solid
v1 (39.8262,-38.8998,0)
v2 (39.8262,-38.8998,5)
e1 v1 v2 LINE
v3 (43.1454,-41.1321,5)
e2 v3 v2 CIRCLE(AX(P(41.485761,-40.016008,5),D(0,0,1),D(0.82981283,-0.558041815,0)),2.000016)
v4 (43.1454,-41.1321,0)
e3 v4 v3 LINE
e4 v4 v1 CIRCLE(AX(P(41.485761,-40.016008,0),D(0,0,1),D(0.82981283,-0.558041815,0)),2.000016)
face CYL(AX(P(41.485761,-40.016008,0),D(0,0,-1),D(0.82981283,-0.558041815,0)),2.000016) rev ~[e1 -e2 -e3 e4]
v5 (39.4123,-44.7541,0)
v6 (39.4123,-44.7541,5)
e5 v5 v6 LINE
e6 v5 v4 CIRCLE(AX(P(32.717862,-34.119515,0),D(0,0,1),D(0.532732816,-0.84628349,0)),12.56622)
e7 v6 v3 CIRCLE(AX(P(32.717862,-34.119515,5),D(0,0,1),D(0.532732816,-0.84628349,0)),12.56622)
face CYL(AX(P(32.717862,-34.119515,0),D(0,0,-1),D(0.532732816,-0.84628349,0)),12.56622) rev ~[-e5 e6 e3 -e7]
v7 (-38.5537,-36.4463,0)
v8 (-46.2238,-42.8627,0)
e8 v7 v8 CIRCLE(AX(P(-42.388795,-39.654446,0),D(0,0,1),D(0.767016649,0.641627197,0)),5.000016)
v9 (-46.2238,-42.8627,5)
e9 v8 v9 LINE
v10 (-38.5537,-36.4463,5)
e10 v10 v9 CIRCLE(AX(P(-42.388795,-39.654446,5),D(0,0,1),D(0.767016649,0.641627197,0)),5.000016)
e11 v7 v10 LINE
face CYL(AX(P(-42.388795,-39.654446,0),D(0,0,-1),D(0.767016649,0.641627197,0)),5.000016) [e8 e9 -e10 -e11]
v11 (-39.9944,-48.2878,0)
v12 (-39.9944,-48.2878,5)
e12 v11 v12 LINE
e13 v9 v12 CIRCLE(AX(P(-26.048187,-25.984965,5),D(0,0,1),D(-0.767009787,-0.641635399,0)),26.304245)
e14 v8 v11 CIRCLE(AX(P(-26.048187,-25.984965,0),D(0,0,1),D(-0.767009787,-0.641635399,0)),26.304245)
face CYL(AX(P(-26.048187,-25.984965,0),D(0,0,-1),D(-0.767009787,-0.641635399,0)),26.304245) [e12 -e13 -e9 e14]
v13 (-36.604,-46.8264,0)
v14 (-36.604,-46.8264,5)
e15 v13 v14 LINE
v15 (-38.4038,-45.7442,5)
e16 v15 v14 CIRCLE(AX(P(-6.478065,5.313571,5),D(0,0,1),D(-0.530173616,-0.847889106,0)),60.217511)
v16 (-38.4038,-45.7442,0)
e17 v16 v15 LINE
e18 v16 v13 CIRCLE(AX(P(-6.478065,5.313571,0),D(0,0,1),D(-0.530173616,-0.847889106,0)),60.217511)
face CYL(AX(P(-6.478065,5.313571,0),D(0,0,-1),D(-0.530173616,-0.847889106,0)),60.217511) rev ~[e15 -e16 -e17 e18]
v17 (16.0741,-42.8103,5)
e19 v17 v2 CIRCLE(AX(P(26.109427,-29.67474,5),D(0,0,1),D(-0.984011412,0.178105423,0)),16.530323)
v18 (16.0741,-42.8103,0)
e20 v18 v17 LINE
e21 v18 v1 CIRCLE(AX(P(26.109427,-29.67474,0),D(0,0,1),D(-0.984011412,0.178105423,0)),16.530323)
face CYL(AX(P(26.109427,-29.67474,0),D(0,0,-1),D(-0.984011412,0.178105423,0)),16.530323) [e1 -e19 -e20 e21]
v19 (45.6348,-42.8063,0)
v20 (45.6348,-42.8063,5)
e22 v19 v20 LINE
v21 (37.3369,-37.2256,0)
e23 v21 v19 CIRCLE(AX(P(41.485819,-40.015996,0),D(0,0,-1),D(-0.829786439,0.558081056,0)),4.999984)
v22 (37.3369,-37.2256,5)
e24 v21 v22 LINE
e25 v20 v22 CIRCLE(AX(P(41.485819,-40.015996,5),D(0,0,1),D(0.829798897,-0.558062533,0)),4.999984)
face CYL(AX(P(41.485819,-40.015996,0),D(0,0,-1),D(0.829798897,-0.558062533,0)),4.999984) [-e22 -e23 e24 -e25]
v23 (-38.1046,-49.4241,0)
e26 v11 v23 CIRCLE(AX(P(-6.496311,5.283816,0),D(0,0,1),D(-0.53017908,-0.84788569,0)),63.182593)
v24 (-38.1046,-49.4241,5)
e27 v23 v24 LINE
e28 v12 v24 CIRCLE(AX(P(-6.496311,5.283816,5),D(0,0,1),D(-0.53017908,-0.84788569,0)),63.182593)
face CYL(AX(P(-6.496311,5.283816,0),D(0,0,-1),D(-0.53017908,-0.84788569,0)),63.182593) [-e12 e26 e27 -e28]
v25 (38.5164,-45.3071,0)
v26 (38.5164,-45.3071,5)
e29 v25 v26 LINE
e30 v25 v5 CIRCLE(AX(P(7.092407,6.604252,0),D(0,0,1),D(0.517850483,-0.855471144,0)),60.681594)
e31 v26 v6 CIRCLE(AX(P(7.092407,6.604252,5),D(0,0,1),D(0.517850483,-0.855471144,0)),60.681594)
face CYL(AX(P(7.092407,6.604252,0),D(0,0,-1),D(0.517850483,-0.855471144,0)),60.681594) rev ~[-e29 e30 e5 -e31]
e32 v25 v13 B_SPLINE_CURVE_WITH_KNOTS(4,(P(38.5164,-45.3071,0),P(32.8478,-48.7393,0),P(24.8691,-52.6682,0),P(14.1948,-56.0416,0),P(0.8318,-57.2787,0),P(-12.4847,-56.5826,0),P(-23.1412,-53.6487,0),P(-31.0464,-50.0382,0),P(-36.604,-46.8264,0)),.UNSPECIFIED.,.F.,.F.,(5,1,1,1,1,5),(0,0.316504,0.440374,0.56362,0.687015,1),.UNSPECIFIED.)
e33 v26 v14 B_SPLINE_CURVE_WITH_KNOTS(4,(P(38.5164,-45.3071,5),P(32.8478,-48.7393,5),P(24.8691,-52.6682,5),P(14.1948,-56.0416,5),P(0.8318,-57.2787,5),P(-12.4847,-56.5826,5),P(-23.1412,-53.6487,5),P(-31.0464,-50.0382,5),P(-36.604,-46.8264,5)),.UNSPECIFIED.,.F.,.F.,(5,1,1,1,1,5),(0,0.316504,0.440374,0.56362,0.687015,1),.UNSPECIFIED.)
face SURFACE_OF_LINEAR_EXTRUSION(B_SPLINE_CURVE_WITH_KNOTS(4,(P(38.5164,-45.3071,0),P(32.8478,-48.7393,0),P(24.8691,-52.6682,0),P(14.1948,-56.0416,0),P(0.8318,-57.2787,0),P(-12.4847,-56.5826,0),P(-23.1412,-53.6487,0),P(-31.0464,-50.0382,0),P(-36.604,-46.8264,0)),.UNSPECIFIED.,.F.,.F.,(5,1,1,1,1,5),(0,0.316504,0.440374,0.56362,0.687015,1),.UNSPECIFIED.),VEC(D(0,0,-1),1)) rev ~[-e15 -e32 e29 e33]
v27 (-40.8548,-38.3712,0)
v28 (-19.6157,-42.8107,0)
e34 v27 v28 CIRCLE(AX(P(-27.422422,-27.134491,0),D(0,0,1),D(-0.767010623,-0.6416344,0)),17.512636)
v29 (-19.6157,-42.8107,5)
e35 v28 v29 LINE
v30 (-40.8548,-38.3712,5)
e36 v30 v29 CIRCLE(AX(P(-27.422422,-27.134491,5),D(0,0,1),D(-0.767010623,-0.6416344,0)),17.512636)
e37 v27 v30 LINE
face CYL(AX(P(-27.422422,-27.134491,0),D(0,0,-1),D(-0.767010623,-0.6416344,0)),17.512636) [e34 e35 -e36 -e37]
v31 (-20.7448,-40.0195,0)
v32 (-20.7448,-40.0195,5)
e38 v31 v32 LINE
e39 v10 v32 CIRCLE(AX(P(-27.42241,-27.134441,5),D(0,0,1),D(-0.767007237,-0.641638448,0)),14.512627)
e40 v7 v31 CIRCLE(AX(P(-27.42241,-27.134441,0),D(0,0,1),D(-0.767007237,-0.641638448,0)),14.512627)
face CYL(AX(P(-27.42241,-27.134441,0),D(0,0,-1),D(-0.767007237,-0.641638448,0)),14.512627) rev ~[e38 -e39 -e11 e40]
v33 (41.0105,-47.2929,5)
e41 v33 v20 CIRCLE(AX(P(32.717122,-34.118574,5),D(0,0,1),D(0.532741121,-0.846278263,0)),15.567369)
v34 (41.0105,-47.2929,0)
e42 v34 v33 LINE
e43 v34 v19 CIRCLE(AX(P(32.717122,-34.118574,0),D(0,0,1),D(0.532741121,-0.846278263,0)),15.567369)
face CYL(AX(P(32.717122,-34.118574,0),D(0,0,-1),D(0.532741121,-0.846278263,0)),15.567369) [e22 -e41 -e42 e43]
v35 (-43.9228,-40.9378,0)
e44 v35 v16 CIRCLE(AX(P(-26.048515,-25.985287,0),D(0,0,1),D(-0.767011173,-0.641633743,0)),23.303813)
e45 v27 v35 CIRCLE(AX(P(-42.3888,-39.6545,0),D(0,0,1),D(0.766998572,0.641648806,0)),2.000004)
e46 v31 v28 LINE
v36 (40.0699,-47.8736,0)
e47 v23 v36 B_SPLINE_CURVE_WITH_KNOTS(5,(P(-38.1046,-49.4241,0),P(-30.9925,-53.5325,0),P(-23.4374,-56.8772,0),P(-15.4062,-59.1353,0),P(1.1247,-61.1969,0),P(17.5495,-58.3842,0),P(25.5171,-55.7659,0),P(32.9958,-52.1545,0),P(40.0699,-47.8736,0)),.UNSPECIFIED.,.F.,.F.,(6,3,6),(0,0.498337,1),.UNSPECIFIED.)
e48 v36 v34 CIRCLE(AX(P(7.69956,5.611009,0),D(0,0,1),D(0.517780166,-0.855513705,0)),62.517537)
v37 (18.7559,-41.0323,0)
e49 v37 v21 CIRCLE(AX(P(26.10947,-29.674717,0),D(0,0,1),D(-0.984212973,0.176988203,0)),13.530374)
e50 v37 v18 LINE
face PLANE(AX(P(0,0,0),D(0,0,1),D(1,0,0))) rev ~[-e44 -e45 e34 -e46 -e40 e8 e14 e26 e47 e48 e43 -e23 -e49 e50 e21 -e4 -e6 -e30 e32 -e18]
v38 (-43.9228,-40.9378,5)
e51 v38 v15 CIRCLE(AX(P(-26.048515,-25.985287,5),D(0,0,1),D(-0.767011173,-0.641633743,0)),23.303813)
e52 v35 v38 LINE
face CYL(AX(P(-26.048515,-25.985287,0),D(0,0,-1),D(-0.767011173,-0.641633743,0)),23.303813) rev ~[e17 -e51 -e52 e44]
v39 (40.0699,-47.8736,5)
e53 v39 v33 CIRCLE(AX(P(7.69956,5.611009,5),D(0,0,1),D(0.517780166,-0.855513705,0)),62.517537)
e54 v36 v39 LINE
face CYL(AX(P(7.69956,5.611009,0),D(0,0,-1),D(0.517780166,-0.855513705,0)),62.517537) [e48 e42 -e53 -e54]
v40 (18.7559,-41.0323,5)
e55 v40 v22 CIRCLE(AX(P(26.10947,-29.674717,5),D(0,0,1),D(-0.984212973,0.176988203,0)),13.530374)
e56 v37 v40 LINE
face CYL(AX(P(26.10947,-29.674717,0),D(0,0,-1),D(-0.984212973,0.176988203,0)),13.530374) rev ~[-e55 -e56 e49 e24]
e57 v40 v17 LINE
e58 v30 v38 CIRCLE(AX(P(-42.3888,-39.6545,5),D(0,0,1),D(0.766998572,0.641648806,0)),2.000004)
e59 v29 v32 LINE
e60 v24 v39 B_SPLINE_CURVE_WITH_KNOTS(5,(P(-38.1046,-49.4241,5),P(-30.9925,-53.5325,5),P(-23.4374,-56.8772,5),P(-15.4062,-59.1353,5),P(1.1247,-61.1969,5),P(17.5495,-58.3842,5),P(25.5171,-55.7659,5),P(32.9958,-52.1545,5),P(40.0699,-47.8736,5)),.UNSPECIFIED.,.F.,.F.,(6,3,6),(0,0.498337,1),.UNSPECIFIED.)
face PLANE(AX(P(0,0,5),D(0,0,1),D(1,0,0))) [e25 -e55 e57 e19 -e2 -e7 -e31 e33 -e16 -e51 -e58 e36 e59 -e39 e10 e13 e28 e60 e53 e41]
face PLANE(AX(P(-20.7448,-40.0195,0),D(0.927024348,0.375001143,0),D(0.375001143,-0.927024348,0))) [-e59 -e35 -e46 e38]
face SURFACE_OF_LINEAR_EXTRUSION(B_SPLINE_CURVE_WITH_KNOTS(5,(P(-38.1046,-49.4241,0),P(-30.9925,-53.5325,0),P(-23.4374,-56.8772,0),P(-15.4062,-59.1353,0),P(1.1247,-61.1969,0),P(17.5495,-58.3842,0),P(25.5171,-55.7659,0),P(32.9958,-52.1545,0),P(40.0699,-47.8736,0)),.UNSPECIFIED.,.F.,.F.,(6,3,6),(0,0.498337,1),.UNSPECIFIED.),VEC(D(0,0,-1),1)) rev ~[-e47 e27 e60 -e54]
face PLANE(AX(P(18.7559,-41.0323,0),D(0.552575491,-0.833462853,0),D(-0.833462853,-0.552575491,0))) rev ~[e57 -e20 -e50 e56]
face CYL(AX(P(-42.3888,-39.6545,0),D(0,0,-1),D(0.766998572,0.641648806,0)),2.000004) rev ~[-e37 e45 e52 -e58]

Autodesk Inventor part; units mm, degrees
ref_plane "YZ Plane" through (0, 0, 0) normal (1, 0, 0) x (0, 1, 0)
ref_plane "XZ Plane" through (0, 0, 0) normal (0, 1, 0) x (-1, 0, 0)
ref_plane "XY Plane" through (0, 0, 0) normal (0, 0, 1) x (1, 0, 0)
sketch "スケッチ1" plane through (0, 0, 0) normal (0, 0, 1) x (1, 0, 0)
  spline S0 degree 4 poles (38.5164, -45.3071) (32.8487, -48.7376) (24.871, -52.6644) (14.1977, -56.036) (0.8351, -57.2731) (-12.4819, -56.5781) (-23.1394, -53.6461) (-31.0456, -50.0372) (-36.604, -46.8264) knots 0 0 0 0 0 0.316482 0.440352 0.563601 0.687002 1 1 1 1 1
  circle A0 centre (0, 0) radius 1.3
  circle A1 centre (0, 0) radius 2.5
  circle A2 centre (0, 0) radius 5
  line L0 (4.899, 1) -> (9.798, -23)
  line L1 (-4.899, 1) -> (-9.798, -23)
  line L2 (-3.817, -10.1196) -> (-8.9705, -20.5808)
  circle A3 centre (0, -12) radius 4.255
  line L3 (3.817, -10.1196) -> (8.9705, -20.5808)
  circle A4 centre (0.0033, -24.9496) radius 10
  circle A5 centre (0, -25) radius 7.025
  spline S1 degree 4 poles (51.4895, -34.9586) (51.1529, -35.2256) (50.6846, -35.5944) (50.0873, -36.0604) (49.3638, -36.6179) (48.8453, -37.0139) (48.332, -37.4027) (47.8236, -37.7843) (47.3201, -38.159) (46.8211, -38.527) (46.3265, -38.8884) (45.8362, -39.2435) (45.3499, -39.5924) (44.8675, -39.9354) (44.3888, -40.2724) (43.9136, -40.6038) (43.4419, -40.9296) (42.9735, -41.25) (42.5081, -41.5651) (42.0458, -41.8751) (41.5864, -42.18) (41.1297, -42.48) (40.6756, -42.7752) (40.2241, -43.0657) (39.7749, -43.3517) (39.328, -43.6331) (38.8834, -43.9101) (38.4408, -44.1828) (38.0002, -44.4513) (37.5615, -44.7157) (37.1246, -44.9759) (36.6894, -45.2322) (36.2559, -45.4846) (35.8239, -45.7332) (35.3934, -45.9779) (34.9643, -46.2189) (34.5365, -46.4563) (34.1101, -46.6901) (33.6848, -46.9203) (33.2606, -47.1471) (32.8375, -47.3704) (32.4155, -47.5903) (31.9943, -47.8068) (31.5741, -48.0201) (31.1548, -48.23) (30.7362, -48.4368) (30.3184, -48.6403) (29.9013, -48.8407) (29.4848, -49.038) (29.069, -49.2322) (28.6537, -49.4233) (28.239, -49.6114) (27.8248, -49.7965) (27.411, -49.9786) (26.9977, -50.1578) (26.5847, -50.334) (26.1721, -50.5073) (25.7598, -50.6777) (25.3479, -50.8453) (24.9362, -51.01) (24.5247, -51.1719) (24.1135, -51.331) (23.7024, -51.4873) (23.2916, -51.6408) (22.8809, -51.7915) (22.4703, -51.9394) (22.0598, -52.0847) (21.6495, -52.2271) (21.2392, -52.3669) (20.829, -52.504) (20.4188, -52.6383) (20.0086, -52.77) (19.5985, -52.8989) (19.1884, -53.0252) (18.7783, -53.1489) (18.3681, -53.2698) (17.958, -53.3881) (17.5477, -53.5038) (17.1375, -53.6167) (16.7272, -53.7271) (16.3168, -53.8348) (15.9064, -53.9399) (15.4959, -54.0424) (15.0853, -54.1422) (14.6747, -54.2394) (14.2639, -54.334) (13.8531, -54.426) (13.4422, -54.5153) (13.0311, -54.6021) (12.62, -54.6862) (12.2088, -54.7677) (11.7975, -54.8466) (11.3861, -54.9229) (10.9746, -54.9966) (10.563, -55.0677) (10.1513, -55.1362) (9.7395, -55.2021) (9.3276, -55.2654) (8.9156, -55.3261) (8.5036, -55.3842) (8.0914, -55.4397) (7.6792, -55.4926) (7.2669, -55.5428) (6.8545, -55.5905) (6.4421, -55.6356) (6.0295, -55.6781) (5.617, -55.718) (5.2043, -55.7553) (4.7916, -55.79) (4.3789, -55.822) (3.9661, -55.8515) (3.5533, -55.8784) (3.1405, -55.9027) (2.7276, -55.9244) (2.3147, -55.9435) (1.9018, -55.96) (1.489, -55.9739) (1.0761, -55.9851) (0.6632, -55.9938) (0.2503, -55.9999) (-0.1625, -56.0034) (-0.5753, -56.0043) (-0.9881, -56.0026) (-1.4008, -55.9982) (-1.8134, -55.9913) (-2.2261, -55.9818) (-2.6386, -55.9697) (-3.0511, -55.955) (-3.4634, -55.9376) (-3.8757, -55.9177) (-4.2879, -55.8952) (-4.7, -55.8701) (-5.112, -55.8424) (-5.5239, -55.8121) (-5.9357, -55.7791) (-6.3473, -55.7436) (-6.7588, -55.7055) (-7.1701, -55.6648) (-7.5813, -55.6215) (-7.9923, -55.5756) (-8.4032, -55.5271) (-8.8139, -55.4761) (-9.2244, -55.4224) (-9.6348, -55.3661) (-10.0449, -55.3072) (-10.4549, -55.2458) (-10.8647, -55.1817) (-11.2743, -55.1151) (-11.6837, -55.0458) (-12.0928, -54.974) (-12.5018, -54.8995) (-12.9105, -54.8225) (-13.3191, -54.7429) (-13.7274, -54.6607) (-14.1355, -54.5759) (-14.5434, -54.4884) (-14.951, -54.3984) (-15.3585, -54.3058) (-15.7657, -54.2106) (-16.1727, -54.1128) (-16.5794, -54.0124) (-16.986, -53.9094) (-17.3923, -53.8038) (-17.7984, -53.6956) (-18.2043, -53.5848) (-18.61, -53.4713) (-19.0155, -53.3553) (-19.4208, -53.2366) (-19.8259, -53.1153) (-20.2308, -52.9913) (-20.6356, -52.8648) (-21.0401, -52.7355) (-21.4446, -52.6037) (-21.8489, -52.4692) (-22.253, -52.332) (-22.657, -52.1921) (-23.0609, -52.0496) (-23.4648, -51.9044) (-23.8685, -51.7565) (-24.2722, -51.6059) (-24.6759, -51.4526) (-25.0796, -51.2965) (-25.4832, -51.1377) (-25.8869, -50.9761) (-26.2907, -50.8117) (-26.6945, -50.6446) (-27.0985, -50.4746) (-27.5026, -50.3018) (-27.9068, -50.1261) (-28.3113, -49.9476) (-28.7161, -49.7661) (-29.1211, -49.5817) (-29.5265, -49.3944) (-29.9322, -49.204) (-30.3384, -49.0107) (-30.7451, -48.8142) (-31.1523, -48.6147) (-31.5601, -48.412) (-31.9685, -48.2062) (-32.3777, -47.9971) (-32.7876, -47.7847) (-33.1984, -47.569) (-33.6102, -47.3499) (-34.023, -47.1273) (-34.4368, -46.9012) (-34.8519, -46.6716) (-35.2682, -46.4382) (-35.686, -46.2011) (-36.1052, -45.9602) (-36.5261, -45.7154) (-36.9487, -45.4665) (-37.3732, -45.2135) (-37.7997, -44.9563) (-38.2284, -44.6947) (-38.6594, -44.4287) (-39.0929, -44.158) (-39.5291, -43.8825) (-39.9681, -43.6021) (-40.4101, -43.3165) (-40.8555, -43.0257) (-41.3043, -42.7295) (-41.7569, -42.4275) (-42.2135, -42.1196) (-42.6743, -41.8055) (-43.1398, -41.485) (-43.6102, -41.1578) (-44.0858, -40.8236) (-44.567, -40.482) (-45.0542, -40.1327) (-45.5479, -39.7753) (-46.0484, -39.4095) (-46.5564, -39.0347) (-47.0722, -38.6504) (-47.5966, -38.2562) (-48.13, -37.8515) (-48.6732, -37.4356) (-49.2269, -37.0078) (-50.01, -36.3976) (-50.6631, -35.8819) (-51.1798, -35.4699) (-51.5542, -35.1694) knots 0 0 0 0 0 0.01253 0.017489 0.022414 0.027307 0.032168 0.036998 0.041798 0.046569 0.051311 0.056026 0.060715 0.065378 0.070016 0.074629 0.079219 0.083786 0.088331 0.092854 0.097357 0.101839 0.106302 0.110746 0.115172 0.119579 0.12397 0.128343 0.132701 0.137042 0.141369 0.14568 0.149978 0.154261 0.158531 0.162788 0.167033 0.171265 0.175486 0.179695 0.183893 0.18808 0.192257 0.196424 0.200581 0.204729 0.208867 0.212997 0.217119 0.221232 0.225337 0.229434 0.233524 0.237607 0.241682 0.245751 0.249814 0.25387 0.25792 0.261964 0.266002 0.270035 0.274062 0.278085 0.282102 0.286114 0.290122 0.294125 0.298124 0.302119 0.30611 0.310097 0.31408 0.318059 0.322035 0.326007 0.329976 0.333942 0.337905 0.341865 0.345823 0.349777 0.353729 0.357678 0.361625 0.365569 0.369511 0.373451 0.377389 0.381325 0.385259 0.389191 0.393122 0.39705 0.400977 0.404903 0.408826 0.412749 0.41667 0.42059 0.424508 0.428426 0.432342 0.436257 0.440171 0.444085 0.447997 0.451908 0.455819 0.459729 0.463638 0.467547 0.471454 0.475362 0.479269 0.483175 0.487081 0.490987 0.494892 0.498797 0.502702 0.506607 0.510511 0.514415 0.51832 0.522224 0.526128 0.530033 0.533937 0.537842 0.541747 0.545652 0.549557 0.553463 0.557369 0.561276 0.565183 0.56909 0.572998 0.576907 0.580817 0.584727 0.588638 0.592549 0.596462 0.600375 0.60429 0.608205 0.612122 0.616039 0.619958 0.623879 0.6278 0.631723 0.635647 0.639573 0.643501 0.64743 0.651361 0.655294 0.659229 0.663165 0.667104 0.671045 0.674989 0.678934 0.682883 0.686833 0.690787 0.694743 0.698702 0.702664 0.70663 0.710598 0.71457 0.718546 0.722525 0.726508 0.730496 0.734487 0.738483 0.742483 0.746488 0.750498 0.754514 0.758534 0.76256 0.766592 0.77063 0.774674 0.778725 0.782783 0.786848 0.79092 0.795001 0.799089 0.803186 0.807291 0.811406 0.815531 0.819665 0.82381 0.827967 0.832134 0.836314 0.840506 0.844711 0.84893 0.853163 0.857412 0.861676 0.865957 0.870254 0.87457 0.878905 0.88326 0.887636 0.892033 0.896453 0.900898 0.905368 0.909864 0.914388 0.918942 0.923526 0.928143 0.932794 0.937481 0.942205 0.94697 0.951777 0.956628 0.961526 0.966473 0.971473 0.976527 0.981641 0.986815 1 1 1 1 1 construction
  line L4 (-36.604, -46.8264) -> (0, 0) construction
  line L5 (0, 0) -> (38.5164, -45.3071) construction
  line L6 (-38.4038, -45.7442) -> (0, 0) construction
  line L7 (39.4123, -44.7541) -> (0, 0) construction
  line L8 (0, 0) -> (-43.9228, -40.9378) construction
  line L9 (43.1454, -41.1321) -> (0, 0) construction
  arc A6 (-38.4038, -45.7442) -> (-36.604, -46.8264) centre (-6.5918, 5.1281) ccw
  arc A7 (38.5164, -45.3071) -> (39.4123, -44.7541) centre (7.4479, 6.0227) ccw
  arc A8 (-43.9228, -40.9378) -> (-38.4038, -45.7442) centre (-26.0471, -25.9839) ccw
  arc A9 (39.4123, -44.7541) -> (43.1454, -41.1321) centre (32.7173, -34.1188) ccw
  line L10 (36.2541, -30.9682) -> (42.4664, -35.652)
  line L11 (-31.1512, -26.4822) -> (-36.604, -31.0671)
  line L12 (-36.604, -96) -> (31.1535, -96) construction
  line L13 (-33.8776, -60) -> (44.0237, -60) construction
  line L14 (59.4013, -96) -> (59.4013, -81)
  line L15 (59.4013, -81) -> (-53.0814, -81) construction
  arc A10 (36.2232, -74.5536) -> (59.4013, -81) centre (70, 2) ccw construction
  line L16 (70, 2) -> (36.2232, -74.5536) construction
  line L17 (70, 2) -> (59.4013, -81) construction
  arc A11 (-71.6102, -42.5485) -> (-53.0814, -81) centre (70, 2) ccw construction
  line L18 (70, 2) -> (-71.6102, -42.5485) construction
  line L19 (70, 2) -> (-53.0814, -81) construction
  line L20 (-71.6102, -42.5485) -> (36.2232, -74.5536) construction
  arc A12 (-53.0814, -81) -> (-15.0732, -119.6576) centre (70, 2) ccw construction
  line L21 (70, 2) -> (-15.0732, -119.6576) construction
  line L22 (70, 2) -> (-53.0814, -81) construction
  arc A13 (59.4013, -81) -> (89.9091, -79.2709) centre (70, 2) ccw construction
  line L23 (70, 2) -> (89.9091, -79.2709) construction
  line L24 (70, 2) -> (59.4013, -81) construction
  line L25 (-15.0732, -119.6576) -> (89.9091, -79.2709) construction
  arc A14 (-40.8548, -38.3712) -> (-43.9228, -40.9378) centre (-42.3888, -39.6545) ccw
  line L26 (-43.9228, -40.9378) -> (-42.3888, -39.6545) construction
  line L27 (-40.8548, -38.3712) -> (-42.3888, -39.6545) construction
  arc A15 (43.1454, -41.1321) -> (39.8262, -38.8998) centre (41.4858, -40.016) ccw
  line L28 (43.1454, -41.1321) -> (41.4858, -40.016) construction
  line L29 (39.8262, -38.8998) -> (41.4858, -40.016) construction
  arc A16 (9.8434, -26.7306) -> (39.8262, -38.8998) centre (26.1095, -29.6747) ccw
  arc A17 (-40.8548, -38.3712) -> (-9.9651, -25.7437) centre (-27.4224, -27.1344) ccw
  arc A18 (-38.5537, -36.4463) -> (-12.9543, -25.9986) centre (-27.4224, -27.1344) ccw
  arc A19 (-38.5537, -36.4463) -> (-46.2238, -42.8627) centre (-42.3888, -39.6545) ccw
  arc A20 (-46.2238, -42.8627) -> (-39.9944, -48.2878) centre (-26.0471, -25.9839) ccw
  arc A21 (-39.9944, -48.2878) -> (-38.1046, -49.4241) centre (-6.5918, 5.1281) ccw
  arc A22 (40.0699, -47.8736) -> (41.0105, -47.2929) centre (7.4479, 6.0227) ccw
  arc A23 (41.0105, -47.2929) -> (45.6348, -42.8063) centre (32.7173, -34.1188) ccw
  arc A24 (45.6348, -42.8063) -> (37.3369, -37.2256) centre (41.4858, -40.016) ccw
  arc A25 (12.7927, -27.28) -> (37.3369, -37.2256) centre (26.1095, -29.6747) ccw
  line L30 (-20.7448, -40.0195) -> (-19.6157, -42.8107)
  line L31 (18.7559, -41.0323) -> (16.0741, -42.8103)
  spline S2 degree 4 poles (38.5164, -45.3071) (32.8478, -48.7393) (24.8691, -52.6682) (14.1948, -56.0416) (0.8318, -57.2787) (-12.4847, -56.5826) (-23.1412, -53.6487) (-31.0464, -50.0382) (-36.604, -46.8264) knots 0 0 0 0 0 0.316504 0.440374 0.56362 0.687015 1 1 1 1 1
  circle A26 centre (0, 0) radius 1.3
  circle A27 centre (0, 0) radius 2.5
  circle A28 centre (0, 0) radius 5
  line L32 (4.899, 1) -> (9.798, -23)
  line L33 (-4.899, 1) -> (-9.798, -23)
  line L34 (-3.817, -10.1196) -> (-8.9705, -20.5808)
  circle A29 centre (0, -12) radius 4.255
  line L35 (3.817, -10.1196) -> (8.9705, -20.5808)
  circle A30 centre (0.0012, -24.9711) radius 10
  circle A31 centre (0, -25) radius 7.025
  spline S3 degree 4 poles (51.4895, -34.9586) (51.1529, -35.2256) (50.6846, -35.5944) (50.0873, -36.0604) (49.3638, -36.6179) (48.8453, -37.0139) (48.332, -37.4027) (47.8236, -37.7843) (47.3201, -38.159) (46.8211, -38.527) (46.3265, -38.8884) (45.8362, -39.2435) (45.3499, -39.5924) (44.8675, -39.9354) (44.3888, -40.2724) (43.9136, -40.6038) (43.4419, -40.9296) (42.9735, -41.25) (42.5081, -41.5651) (42.0458, -41.8751) (41.5864, -42.18) (41.1297, -42.48) (40.6756, -42.7752) (40.2241, -43.0657) (39.7749, -43.3517) (39.328, -43.6331) (38.8834, -43.9101) (38.4408, -44.1828) (38.0002, -44.4513) (37.5615, -44.7157) (37.1246, -44.9759) (36.6894, -45.2322) (36.2559, -45.4846) (35.8239, -45.7332) (35.3934, -45.9779) (34.9643, -46.2189) (34.5365, -46.4563) (34.1101, -46.6901) (33.6848, -46.9203) (33.2606, -47.1471) (32.8375, -47.3704) (32.4155, -47.5903) (31.9943, -47.8068) (31.5741, -48.0201) (31.1548, -48.23) (30.7362, -48.4368) (30.3184, -48.6403) (29.9013, -48.8407) (29.4848, -49.038) (29.069, -49.2322) (28.6537, -49.4233) (28.239, -49.6114) (27.8248, -49.7965) (27.411, -49.9786) (26.9977, -50.1578) (26.5847, -50.334) (26.1721, -50.5073) (25.7598, -50.6777) (25.3479, -50.8453) (24.9362, -51.01) (24.5247, -51.1719) (24.1135, -51.331) (23.7024, -51.4873) (23.2916, -51.6408) (22.8809, -51.7915) (22.4703, -51.9394) (22.0598, -52.0847) (21.6495, -52.2271) (21.2392, -52.3669) (20.829, -52.504) (20.4188, -52.6383) (20.0086, -52.77) (19.5985, -52.8989) (19.1884, -53.0252) (18.7783, -53.1489) (18.3681, -53.2698) (17.958, -53.3881) (17.5477, -53.5038) (17.1375, -53.6167) (16.7272, -53.7271) (16.3168, -53.8348) (15.9064, -53.9399) (15.4959, -54.0424) (15.0853, -54.1422) (14.6747, -54.2394) (14.2639, -54.334) (13.8531, -54.426) (13.4422, -54.5153) (13.0311, -54.6021) (12.62, -54.6862) (12.2088, -54.7677) (11.7975, -54.8466) (11.3861, -54.9229) (10.9746, -54.9966) (10.563, -55.0677) (10.1513, -55.1362) (9.7395, -55.2021) (9.3276, -55.2654) (8.9156, -55.3261) (8.5036, -55.3842) (8.0914, -55.4397) (7.6792, -55.4926) (7.2669, -55.5428) (6.8545, -55.5905) (6.4421, -55.6356) (6.0295, -55.6781) (5.617, -55.718) (5.2043, -55.7553) (4.7916, -55.79) (4.3789, -55.822) (3.9661, -55.8515) (3.5533, -55.8784) (3.1405, -55.9027) (2.7276, -55.9244) (2.3147, -55.9435) (1.9018, -55.96) (1.489, -55.9739) (1.0761, -55.9851) (0.6632, -55.9938) (0.2503, -55.9999) (-0.1625, -56.0034) (-0.5753, -56.0043) (-0.9881, -56.0026) (-1.4008, -55.9982) (-1.8134, -55.9913) (-2.2261, -55.9818) (-2.6386, -55.9697) (-3.0511, -55.955) (-3.4634, -55.9376) (-3.8757, -55.9177) (-4.2879, -55.8952) (-4.7, -55.8701) (-5.112, -55.8424) (-5.5239, -55.8121) (-5.9357, -55.7791) (-6.3473, -55.7436) (-6.7588, -55.7055) (-7.1701, -55.6648) (-7.5813, -55.6215) (-7.9923, -55.5756) (-8.4032, -55.5271) (-8.8139, -55.4761) (-9.2244, -55.4224) (-9.6348, -55.3661) (-10.0449, -55.3072) (-10.4549, -55.2458) (-10.8647, -55.1817) (-11.2743, -55.1151) (-11.6837, -55.0458) (-12.0928, -54.974) (-12.5018, -54.8995) (-12.9105, -54.8225) (-13.3191, -54.7429) (-13.7274, -54.6607) (-14.1355, -54.5759) (-14.5434, -54.4884) (-14.951, -54.3984) (-15.3585, -54.3058) (-15.7657, -54.2106) (-16.1727, -54.1128) (-16.5794, -54.0124) (-16.986, -53.9094) (-17.3923, -53.8038) (-17.7984, -53.6956) (-18.2043, -53.5848) (-18.61, -53.4713) (-19.0155, -53.3553) (-19.4208, -53.2366) (-19.8259, -53.1153) (-20.2308, -52.9913) (-20.6356, -52.8648) (-21.0401, -52.7355) (-21.4446, -52.6037) (-21.8489, -52.4692) (-22.253, -52.332) (-22.657, -52.1921) (-23.0609, -52.0496) (-23.4648, -51.9044) (-23.8685, -51.7565) (-24.2722, -51.6059) (-24.6759, -51.4526) (-25.0796, -51.2965) (-25.4832, -51.1377) (-25.8869, -50.9761) (-26.2907, -50.8117) (-26.6945, -50.6446) (-27.0985, -50.4746) (-27.5026, -50.3018) (-27.9068, -50.1261) (-28.3113, -49.9476) (-28.7161, -49.7661) (-29.1211, -49.5817) (-29.5265, -49.3944) (-29.9322, -49.204) (-30.3384, -49.0107) (-30.7451, -48.8142) (-31.1523, -48.6147) (-31.5601, -48.412) (-31.9685, -48.2062) (-32.3777, -47.9971) (-32.7876, -47.7847) (-33.1984, -47.569) (-33.6102, -47.3499) (-34.023, -47.1273) (-34.4368, -46.9012) (-34.8519, -46.6716) (-35.2682, -46.4382) (-35.686, -46.2011) (-36.1052, -45.9602) (-36.5261, -45.7154) (-36.9487, -45.4665) (-37.3732, -45.2135) (-37.7997, -44.9563) (-38.2284, -44.6947) (-38.6594, -44.4287) (-39.0929, -44.158) (-39.5291, -43.8825) (-39.9681, -43.6021) (-40.4101, -43.3165) (-40.8555, -43.0257) (-41.3043, -42.7295) (-41.7569, -42.4275) (-42.2135, -42.1196) (-42.6743, -41.8055) (-43.1398, -41.485) (-43.6102, -41.1578) (-44.0858, -40.8236) (-44.567, -40.482) (-45.0542, -40.1327) (-45.5479, -39.7753) (-46.0484, -39.4095) (-46.5564, -39.0347) (-47.0722, -38.6504) (-47.5966, -38.2562) (-48.13, -37.8515) (-48.6732, -37.4356) (-49.2269, -37.0078) (-50.01, -36.3976) (-50.6631, -35.8819) (-51.1798, -35.4699) (-51.5542, -35.1694) knots 0 0 0 0 0 0.01253 0.017489 0.022414 0.027307 0.032168 0.036998 0.041798 0.046569 0.051311 0.056026 0.060715 0.065378 0.070016 0.074629 0.079219 0.083786 0.088331 0.092854 0.097357 0.101839 0.106302 0.110746 0.115172 0.119579 0.12397 0.128343 0.132701 0.137042 0.141369 0.14568 0.149978 0.154261 0.158531 0.162788 0.167033 0.171265 0.175486 0.179695 0.183893 0.18808 0.192257 0.196424 0.200581 0.204729 0.208867 0.212997 0.217119 0.221232 0.225337 0.229434 0.233524 0.237607 0.241682 0.245751 0.249814 0.25387 0.25792 0.261964 0.266002 0.270035 0.274062 0.278085 0.282102 0.286114 0.290122 0.294125 0.298124 0.302119 0.30611 0.310097 0.31408 0.318059 0.322035 0.326007 0.329976 0.333942 0.337905 0.341865 0.345823 0.349777 0.353729 0.357678 0.361625 0.365569 0.369511 0.373451 0.377389 0.381325 0.385259 0.389191 0.393122 0.39705 0.400977 0.404903 0.408826 0.412749 0.41667 0.42059 0.424508 0.428426 0.432342 0.436257 0.440171 0.444085 0.447997 0.451908 0.455819 0.459729 0.463638 0.467547 0.471454 0.475362 0.479269 0.483175 0.487081 0.490987 0.494892 0.498797 0.502702 0.506607 0.510511 0.514415 0.51832 0.522224 0.526128 0.530033 0.533937 0.537842 0.541747 0.545652 0.549557 0.553463 0.557369 0.561276 0.565183 0.56909 0.572998 0.576907 0.580817 0.584727 0.588638 0.592549 0.596462 0.600375 0.60429 0.608205 0.612122 0.616039 0.619958 0.623879 0.6278 0.631723 0.635647 0.639573 0.643501 0.64743 0.651361 0.655294 0.659229 0.663165 0.667104 0.671045 0.674989 0.678934 0.682883 0.686833 0.690787 0.694743 0.698702 0.702664 0.70663 0.710598 0.71457 0.718546 0.722525 0.726508 0.730496 0.734487 0.738483 0.742483 0.746488 0.750498 0.754514 0.758534 0.76256 0.766592 0.77063 0.774674 0.778725 0.782783 0.786848 0.79092 0.795001 0.799089 0.803186 0.807291 0.811406 0.815531 0.819665 0.82381 0.827967 0.832134 0.836314 0.840506 0.844711 0.84893 0.853163 0.857412 0.861676 0.865957 0.870254 0.87457 0.878905 0.88326 0.887636 0.892033 0.896453 0.900898 0.905368 0.909864 0.914388 0.918942 0.923526 0.928143 0.932794 0.937481 0.942205 0.94697 0.951777 0.956628 0.961526 0.966473 0.971473 0.976527 0.981641 0.986815 1 1 1 1 1 construction
  line L36 (-36.604, -46.8264) -> (0, 0) construction
  line L37 (0, 0) -> (38.5164, -45.3071) construction
  line L38 (-38.4035, -45.7439) -> (0, 0) construction
  line L39 (39.4122, -44.754) -> (0, 0) construction
  line L40 (0, 0) -> (-43.9228, -40.9378) construction
  line L41 (43.1454, -41.1321) -> (0, 0) construction
  arc A32 (-38.4035, -45.7439) -> (-36.604, -46.8264) centre (-6.5817, 5.1223) ccw
  arc A33 (38.5164, -45.3071) -> (39.4122, -44.754) centre (7.4403, 6.0181) ccw
  arc A34 (-43.9228, -40.9378) -> (-38.4035, -45.7439) centre (-26.0235, -25.9549) ccw
  arc A35 (39.4122, -44.754) -> (43.1454, -41.1321) centre (32.7099, -34.1106) ccw
  line L42 (36.2541, -30.9682) -> (42.4664, -35.652)
  line L43 (-31.1512, -26.4822) -> (-36.604, -31.0671)
  line L44 (-36.604, -96) -> (31.1535, -96) construction
  line L45 (-33.8776, -60) -> (44.0237, -60) construction
  line L46 (59.4013, -96) -> (59.4013, -81)
  line L47 (59.4013, -81) -> (-53.0814, -81) construction
  arc A36 (36.2232, -74.5536) -> (59.4013, -81) centre (70, 2) ccw construction
  line L48 (70, 2) -> (36.2232, -74.5536) construction
  line L49 (70, 2) -> (59.4013, -81) construction
  arc A37 (-71.6102, -42.5485) -> (-53.0814, -81) centre (70, 2) ccw construction
  line L50 (70, 2) -> (-71.6102, -42.5485) construction
  line L51 (70, 2) -> (-53.0814, -81) construction
  line L52 (-71.6102, -42.5485) -> (36.2232, -74.5536) construction
  arc A38 (-53.0814, -81) -> (-15.0732, -119.6576) centre (70, 2) ccw construction
  line L53 (70, 2) -> (-15.0732, -119.6576) construction
  line L54 (70, 2) -> (-53.0814, -81) construction
  arc A39 (59.4013, -81) -> (89.9091, -79.2709) centre (70, 2) ccw construction
  line L55 (70, 2) -> (89.9091, -79.2709) construction
  line L56 (70, 2) -> (59.4013, -81) construction
  line L57 (-15.0732, -119.6576) -> (89.9091, -79.2709) construction
  arc A40 (-40.8555, -38.3703) -> (-43.9228, -40.9378) centre (-42.3892, -39.654) ccw
  line L58 (-43.9228, -40.9378) -> (-42.3892, -39.654) construction
  line L59 (-40.8555, -38.3703) -> (-42.3892, -39.654) construction
  arc A41 (43.1454, -41.1321) -> (39.8267, -38.8991) centre (41.4861, -40.0156) ccw
  line L60 (43.1454, -41.1321) -> (41.4861, -40.0156) construction
  line L61 (39.8267, -38.8991) -> (41.4861, -40.0156) construction
  arc A42 (9.843, -26.7427) -> (39.8267, -38.8991) centre (26.1119, -29.6712) ccw
  arc A43 (-40.8555, -38.3703) -> (-9.968, -25.7556) centre (-27.4267, -27.1294) ccw
  spline S4 degree 5 poles (-38.1046, -49.4241) (-30.9925, -53.5325) (-23.4374, -56.8772) (-15.4062, -59.1353) (1.1247, -61.1969) (17.5495, -58.3842) (25.5171, -55.7659) (32.9958, -52.1545) (40.0699, -47.8736) knots 0 0 0 0 0 0 0.498337 0.498337 0.498337 1 1 1 1 1 1
  point P0 (50.9482, -35.3862)
  point P1 (50.4129, -35.8055)
  point P2 (49.8835, -36.2167)
  point P3 (49.3597, -36.6202)
  point P4 (48.8414, -37.0162)
  point P5 (48.3282, -37.4048)
  point P6 (47.82, -37.7863)
  point P7 (47.3165, -38.1609)
  point P8 (46.8177, -38.5288)
  point P9 (46.3232, -38.8901)
  point P10 (45.833, -39.2452)
  point P11 (45.3467, -39.594)
  point P12 (44.8644, -39.9368)
  point P13 (44.3858, -40.2738)
  point P14 (43.9108, -40.6051)
  point P15 (43.4391, -40.9309)
  point P16 (42.9708, -41.2512)
  point P17 (42.5055, -41.5662)
  point P18 (42.0433, -41.8761)
  point P19 (41.5839, -42.181)
  point P20 (41.1273, -42.4809)
  point P21 (40.6733, -42.7761)
  point P22 (40.2218, -43.0666)
  point P23 (39.7727, -43.3524)
  point P24 (39.3259, -43.6338)
  point P25 (38.8813, -43.9108)
  point P26 (38.4387, -44.1834)
  point P27 (37.9982, -44.4519)
  point P28 (37.5596, -44.7162)
  point P29 (37.1227, -44.9764)
  point P30 (36.6876, -45.2327)
  point P31 (36.2541, -45.485)
  point P32 (35.8222, -45.7335)
  point P33 (35.3917, -45.9782)
  point P34 (34.9627, -46.2192)
  point P35 (34.535, -46.4566)
  point P36 (34.1085, -46.6903)
  point P37 (33.6833, -46.9205)
  point P38 (33.2592, -47.1472)
  point P39 (32.8361, -47.3705)
  point P40 (32.4141, -47.5904)
  point P41 (31.993, -47.8069)
  point P42 (31.5729, -48.0201)
  point P43 (31.1535, -48.23)
  point P44 (30.735, -48.4368)
  point P45 (30.3172, -48.6403)
  point P46 (29.9002, -48.8407)
  point P47 (29.4837, -49.0379)
  point P48 (29.0679, -49.2321)
  point P49 (28.6527, -49.4232)
  point P50 (28.238, -49.6113)
  point P51 (27.8238, -49.7963)
  point P52 (27.41, -49.9784)
  point P53 (26.9967, -50.1576)
  point P54 (26.5838, -50.3338)
  point P55 (26.1712, -50.5071)
  point P56 (25.759, -50.6775)
  point P57 (25.347, -50.8451)
  point P58 (24.9353, -51.0098)
  point P59 (24.5239, -51.1717)
  point P60 (24.1127, -51.3307)
  point P61 (23.7017, -51.487)
  point P62 (23.2909, -51.6405)
  point P63 (22.8802, -51.7912)
  point P64 (22.4696, -51.9391)
  point P65 (22.0592, -52.0843)
  point P66 (21.6488, -52.2268)
  point P67 (21.2386, -52.3666)
  point P68 (20.8284, -52.5036)
  point P69 (20.4182, -52.6379)
  point P70 (20.0081, -52.7696)
  point P71 (19.598, -52.8986)
  point P72 (19.1879, -53.0248)
  point P73 (18.7777, -53.1485)
  point P74 (18.3676, -53.2694)
  point P75 (17.9575, -53.3877)
  point P76 (17.5473, -53.5033)
  point P77 (17.137, -53.6163)
  point P78 (16.7267, -53.7267)
  point P79 (16.3164, -53.8344)
  point P80 (15.906, -53.9395)
  point P81 (15.4955, -54.0419)
  point P82 (15.0849, -54.1417)
  point P83 (14.6743, -54.2389)
  point P84 (14.2635, -54.3335)
  point P85 (13.8527, -54.4255)
  point P86 (13.4418, -54.5148)
  point P87 (13.0308, -54.6016)
  point P88 (12.6197, -54.6857)
  point P89 (12.2085, -54.7672)
  point P90 (11.7972, -54.8461)
  point P91 (11.3858, -54.9224)
  point P92 (10.9743, -54.9961)
  point P93 (10.5627, -55.0672)
  point P94 (10.151, -55.1357)
  point P95 (9.7393, -55.2016)
  point P96 (9.3274, -55.2649)
  point P97 (8.9154, -55.3256)
  point P98 (8.5034, -55.3837)
  point P99 (8.0912, -55.4391)
  point P100 (7.679, -55.492)
  point P101 (7.2667, -55.5423)
  point P102 (6.8543, -55.59)
  point P103 (6.4419, -55.6351)
  point P104 (6.0294, -55.6776)
  point P105 (5.6168, -55.7175)
  point P106 (5.2042, -55.7547)
  point P107 (4.7915, -55.7894)
  point P108 (4.3788, -55.8215)
  point P109 (3.966, -55.851)
  point P110 (3.5532, -55.8779)
  point P111 (3.1404, -55.9022)
  point P112 (2.7275, -55.9239)
  point P113 (2.3147, -55.9429)
  point P114 (1.9018, -55.9594)
  point P115 (1.4889, -55.9733)
  point P116 (1.076, -55.9846)
  point P117 (0.6632, -55.9933)
  point P118 (0.2503, -55.9994)
  point P119 (-0.1625, -56.0028)
  point P120 (-0.5753, -56.0037)
  point P121 (-0.9881, -56.002)
  point P122 (-1.4008, -55.9977)
  point P123 (-1.8134, -55.9908)
  point P124 (-2.226, -55.9813)
  point P125 (-2.6386, -55.9691)
  point P126 (-3.051, -55.9544)
  point P127 (-3.4634, -55.9371)
  point P128 (-3.8757, -55.9172)
  point P129 (-4.2879, -55.8947)
  point P130 (-4.7, -55.8695)
  point P131 (-5.112, -55.8418)
  point P132 (-5.5238, -55.8115)
  point P133 (-5.9356, -55.7786)
  point P134 (-6.3472, -55.7431)
  point P135 (-6.7586, -55.705)
  point P136 (-7.17, -55.6643)
  point P137 (-7.5812, -55.621)
  point P138 (-7.9922, -55.5751)
  point P139 (-8.403, -55.5266)
  point P140 (-8.8137, -55.4755)
  point P141 (-9.2243, -55.4219)
  point P142 (-9.6346, -55.3656)
  point P143 (-10.0447, -55.3067)
  point P144 (-10.4547, -55.2452)
  point P145 (-10.8645, -55.1812)
  point P146 (-11.2741, -55.1145)
  point P147 (-11.6834, -55.0453)
  point P148 (-12.0926, -54.9735)
  point P149 (-12.5016, -54.899)
  point P150 (-12.9103, -54.822)
  point P151 (-13.3188, -54.7424)
  point P152 (-13.7271, -54.6602)
  point P153 (-14.1352, -54.5754)
  point P154 (-14.5431, -54.488)
  point P155 (-14.9507, -54.398)
  point P156 (-15.3582, -54.3054)
  point P157 (-15.7654, -54.2102)
  point P158 (-16.1723, -54.1124)
  point P159 (-16.5791, -54.012)
  point P160 (-16.9856, -53.909)
  point P161 (-17.3919, -53.8034)
  point P162 (-17.798, -53.6951)
  point P163 (-18.2039, -53.5843)
  point P164 (-18.6096, -53.4709)
  point P165 (-19.0151, -53.3548)
  point P166 (-19.4204, -53.2361)
  point P167 (-19.8255, -53.1148)
  point P168 (-20.2304, -52.9909)
  point P169 (-20.6351, -52.8643)
  point P170 (-21.0397, -52.7351)
  point P171 (-21.4441, -52.6033)
  point P172 (-21.8483, -52.4688)
  point P173 (-22.2525, -52.3316)
  point P174 (-22.6565, -52.1918)
  point P175 (-23.0604, -52.0493)
  point P176 (-23.4642, -51.9041)
  point P177 (-23.8679, -51.7562)
  point P178 (-24.2716, -51.6056)
  point P179 (-24.6752, -51.4522)
  point P180 (-25.0789, -51.2962)
  point P181 (-25.4825, -51.1374)
  point P182 (-25.8862, -50.9758)
  point P183 (-26.2899, -50.8115)
  point P184 (-26.6937, -50.6443)
  point P185 (-27.0977, -50.4744)
  point P186 (-27.5017, -50.3016)
  point P187 (-27.906, -50.1259)
  point P188 (-28.3104, -49.9474)
  point P189 (-28.7152, -49.766)
  point P190 (-29.1202, -49.5816)
  point P191 (-29.5255, -49.3943)
  point P192 (-29.9312, -49.2039)
  point P193 (-30.3374, -49.0106)
  point P194 (-30.744, -48.8142)
  point P195 (-31.1512, -48.6147)
  point P196 (-31.5589, -48.412)
  point P197 (-31.9673, -48.2062)
  point P198 (-32.3764, -47.9971)
  point P199 (-32.7863, -47.7848)
  dimension "d0" = 2
  dimension "d1" = 1
  dimension "d2" = 7
  dimension "d3" = 5
  dimension "d4" = 60
  dimension "d5" = 60
  dimension "d6" = 96
  dimension "d7" = 60
  dimension "d8" = 36
  dimension "d9" = 15
  dimension "d10" = 90
  dimension "d11" = 15
  dimension "d12" = 16.531
  dimension "d13" = 16.531
  dimension "d14" = 21.042
  dimension "d15" = 21.042
  dimension "d16" = 2
  dimension "d17" = 180
  dimension "d18" = 2
  dimension "d19" = 180
  dimension "d20" = 16.5303
  dimension "d21" = 44.1339
  dimension "d22" = 18.5303
  dimension "d23" = 87.0684
  dimension "d29" = 3
  dimension "d32" = 2
  dimension "d33" = 1
  dimension "d34" = 7
  dimension "d35" = 5
  dimension "d36" = 60
  dimension "d37" = 60
  dimension "d38" = 96
  dimension "d39" = 60
  dimension "d40" = 36
  dimension "d41" = 15
  dimension "d42" = 90
  dimension "d43" = 15
  dimension "d44" = 16.531
  dimension "d45" = 16.531
  dimension "d46" = 21.042
  dimension "d47" = 21.042
  dimension "d48" = 2
  dimension "d49" = 180
  dimension "d50" = 2
  dimension "d51" = 180
  dimension "d52" = 16.5303
  dimension "d53" = 44.1286
  dimension "d54" = 18.5303
  dimension "d55" = 87.0684
extrude "押し出し1" add sketch "スケッチ1" along normal blind 5 contours A7 A9 A15 A16 L31 A25 A24 A23 A22 S4 A21 A20 A19 A18 L30 A43 A14 A8 A6 S2 | A43 L30 A17
equation "\"d6\" = d26 + d28 + d27"
equation "\"d7\" = d26 - d28 + d27"
equation "\"d11\" = d9"
equation "\"d12\" = d13"
equation "\"d13\" = d24"
equation "\"d14\" = d15"
equation "\"d15\" = d25"
equation "\"d38\" = d58 + d60 + d59"
equation "\"d39\" = d58 - d60 + d59"
equation "\"d43\" = d41"
equation "\"d44\" = d45"
equation "\"d45\" = d56"
equation "\"d46\" = d47"
equation "\"d47\" = d57"
equation "\"d24\" = 16.530955deg"
equation "\"d25\" = 21.041744deg"
equation "\"d56\" = 16.530955deg"
equation "\"d57\" = 21.041744deg"
equation "\"d26\" = 53"
equation "\"d28\" = 18"
equation "\"d27\" = 25"
equation "\"d58\" = 53"
equation "\"d60\" = 18"
equation "\"d59\" = 25"
properties part number "脚ゴム" material "ゴム、黒"
